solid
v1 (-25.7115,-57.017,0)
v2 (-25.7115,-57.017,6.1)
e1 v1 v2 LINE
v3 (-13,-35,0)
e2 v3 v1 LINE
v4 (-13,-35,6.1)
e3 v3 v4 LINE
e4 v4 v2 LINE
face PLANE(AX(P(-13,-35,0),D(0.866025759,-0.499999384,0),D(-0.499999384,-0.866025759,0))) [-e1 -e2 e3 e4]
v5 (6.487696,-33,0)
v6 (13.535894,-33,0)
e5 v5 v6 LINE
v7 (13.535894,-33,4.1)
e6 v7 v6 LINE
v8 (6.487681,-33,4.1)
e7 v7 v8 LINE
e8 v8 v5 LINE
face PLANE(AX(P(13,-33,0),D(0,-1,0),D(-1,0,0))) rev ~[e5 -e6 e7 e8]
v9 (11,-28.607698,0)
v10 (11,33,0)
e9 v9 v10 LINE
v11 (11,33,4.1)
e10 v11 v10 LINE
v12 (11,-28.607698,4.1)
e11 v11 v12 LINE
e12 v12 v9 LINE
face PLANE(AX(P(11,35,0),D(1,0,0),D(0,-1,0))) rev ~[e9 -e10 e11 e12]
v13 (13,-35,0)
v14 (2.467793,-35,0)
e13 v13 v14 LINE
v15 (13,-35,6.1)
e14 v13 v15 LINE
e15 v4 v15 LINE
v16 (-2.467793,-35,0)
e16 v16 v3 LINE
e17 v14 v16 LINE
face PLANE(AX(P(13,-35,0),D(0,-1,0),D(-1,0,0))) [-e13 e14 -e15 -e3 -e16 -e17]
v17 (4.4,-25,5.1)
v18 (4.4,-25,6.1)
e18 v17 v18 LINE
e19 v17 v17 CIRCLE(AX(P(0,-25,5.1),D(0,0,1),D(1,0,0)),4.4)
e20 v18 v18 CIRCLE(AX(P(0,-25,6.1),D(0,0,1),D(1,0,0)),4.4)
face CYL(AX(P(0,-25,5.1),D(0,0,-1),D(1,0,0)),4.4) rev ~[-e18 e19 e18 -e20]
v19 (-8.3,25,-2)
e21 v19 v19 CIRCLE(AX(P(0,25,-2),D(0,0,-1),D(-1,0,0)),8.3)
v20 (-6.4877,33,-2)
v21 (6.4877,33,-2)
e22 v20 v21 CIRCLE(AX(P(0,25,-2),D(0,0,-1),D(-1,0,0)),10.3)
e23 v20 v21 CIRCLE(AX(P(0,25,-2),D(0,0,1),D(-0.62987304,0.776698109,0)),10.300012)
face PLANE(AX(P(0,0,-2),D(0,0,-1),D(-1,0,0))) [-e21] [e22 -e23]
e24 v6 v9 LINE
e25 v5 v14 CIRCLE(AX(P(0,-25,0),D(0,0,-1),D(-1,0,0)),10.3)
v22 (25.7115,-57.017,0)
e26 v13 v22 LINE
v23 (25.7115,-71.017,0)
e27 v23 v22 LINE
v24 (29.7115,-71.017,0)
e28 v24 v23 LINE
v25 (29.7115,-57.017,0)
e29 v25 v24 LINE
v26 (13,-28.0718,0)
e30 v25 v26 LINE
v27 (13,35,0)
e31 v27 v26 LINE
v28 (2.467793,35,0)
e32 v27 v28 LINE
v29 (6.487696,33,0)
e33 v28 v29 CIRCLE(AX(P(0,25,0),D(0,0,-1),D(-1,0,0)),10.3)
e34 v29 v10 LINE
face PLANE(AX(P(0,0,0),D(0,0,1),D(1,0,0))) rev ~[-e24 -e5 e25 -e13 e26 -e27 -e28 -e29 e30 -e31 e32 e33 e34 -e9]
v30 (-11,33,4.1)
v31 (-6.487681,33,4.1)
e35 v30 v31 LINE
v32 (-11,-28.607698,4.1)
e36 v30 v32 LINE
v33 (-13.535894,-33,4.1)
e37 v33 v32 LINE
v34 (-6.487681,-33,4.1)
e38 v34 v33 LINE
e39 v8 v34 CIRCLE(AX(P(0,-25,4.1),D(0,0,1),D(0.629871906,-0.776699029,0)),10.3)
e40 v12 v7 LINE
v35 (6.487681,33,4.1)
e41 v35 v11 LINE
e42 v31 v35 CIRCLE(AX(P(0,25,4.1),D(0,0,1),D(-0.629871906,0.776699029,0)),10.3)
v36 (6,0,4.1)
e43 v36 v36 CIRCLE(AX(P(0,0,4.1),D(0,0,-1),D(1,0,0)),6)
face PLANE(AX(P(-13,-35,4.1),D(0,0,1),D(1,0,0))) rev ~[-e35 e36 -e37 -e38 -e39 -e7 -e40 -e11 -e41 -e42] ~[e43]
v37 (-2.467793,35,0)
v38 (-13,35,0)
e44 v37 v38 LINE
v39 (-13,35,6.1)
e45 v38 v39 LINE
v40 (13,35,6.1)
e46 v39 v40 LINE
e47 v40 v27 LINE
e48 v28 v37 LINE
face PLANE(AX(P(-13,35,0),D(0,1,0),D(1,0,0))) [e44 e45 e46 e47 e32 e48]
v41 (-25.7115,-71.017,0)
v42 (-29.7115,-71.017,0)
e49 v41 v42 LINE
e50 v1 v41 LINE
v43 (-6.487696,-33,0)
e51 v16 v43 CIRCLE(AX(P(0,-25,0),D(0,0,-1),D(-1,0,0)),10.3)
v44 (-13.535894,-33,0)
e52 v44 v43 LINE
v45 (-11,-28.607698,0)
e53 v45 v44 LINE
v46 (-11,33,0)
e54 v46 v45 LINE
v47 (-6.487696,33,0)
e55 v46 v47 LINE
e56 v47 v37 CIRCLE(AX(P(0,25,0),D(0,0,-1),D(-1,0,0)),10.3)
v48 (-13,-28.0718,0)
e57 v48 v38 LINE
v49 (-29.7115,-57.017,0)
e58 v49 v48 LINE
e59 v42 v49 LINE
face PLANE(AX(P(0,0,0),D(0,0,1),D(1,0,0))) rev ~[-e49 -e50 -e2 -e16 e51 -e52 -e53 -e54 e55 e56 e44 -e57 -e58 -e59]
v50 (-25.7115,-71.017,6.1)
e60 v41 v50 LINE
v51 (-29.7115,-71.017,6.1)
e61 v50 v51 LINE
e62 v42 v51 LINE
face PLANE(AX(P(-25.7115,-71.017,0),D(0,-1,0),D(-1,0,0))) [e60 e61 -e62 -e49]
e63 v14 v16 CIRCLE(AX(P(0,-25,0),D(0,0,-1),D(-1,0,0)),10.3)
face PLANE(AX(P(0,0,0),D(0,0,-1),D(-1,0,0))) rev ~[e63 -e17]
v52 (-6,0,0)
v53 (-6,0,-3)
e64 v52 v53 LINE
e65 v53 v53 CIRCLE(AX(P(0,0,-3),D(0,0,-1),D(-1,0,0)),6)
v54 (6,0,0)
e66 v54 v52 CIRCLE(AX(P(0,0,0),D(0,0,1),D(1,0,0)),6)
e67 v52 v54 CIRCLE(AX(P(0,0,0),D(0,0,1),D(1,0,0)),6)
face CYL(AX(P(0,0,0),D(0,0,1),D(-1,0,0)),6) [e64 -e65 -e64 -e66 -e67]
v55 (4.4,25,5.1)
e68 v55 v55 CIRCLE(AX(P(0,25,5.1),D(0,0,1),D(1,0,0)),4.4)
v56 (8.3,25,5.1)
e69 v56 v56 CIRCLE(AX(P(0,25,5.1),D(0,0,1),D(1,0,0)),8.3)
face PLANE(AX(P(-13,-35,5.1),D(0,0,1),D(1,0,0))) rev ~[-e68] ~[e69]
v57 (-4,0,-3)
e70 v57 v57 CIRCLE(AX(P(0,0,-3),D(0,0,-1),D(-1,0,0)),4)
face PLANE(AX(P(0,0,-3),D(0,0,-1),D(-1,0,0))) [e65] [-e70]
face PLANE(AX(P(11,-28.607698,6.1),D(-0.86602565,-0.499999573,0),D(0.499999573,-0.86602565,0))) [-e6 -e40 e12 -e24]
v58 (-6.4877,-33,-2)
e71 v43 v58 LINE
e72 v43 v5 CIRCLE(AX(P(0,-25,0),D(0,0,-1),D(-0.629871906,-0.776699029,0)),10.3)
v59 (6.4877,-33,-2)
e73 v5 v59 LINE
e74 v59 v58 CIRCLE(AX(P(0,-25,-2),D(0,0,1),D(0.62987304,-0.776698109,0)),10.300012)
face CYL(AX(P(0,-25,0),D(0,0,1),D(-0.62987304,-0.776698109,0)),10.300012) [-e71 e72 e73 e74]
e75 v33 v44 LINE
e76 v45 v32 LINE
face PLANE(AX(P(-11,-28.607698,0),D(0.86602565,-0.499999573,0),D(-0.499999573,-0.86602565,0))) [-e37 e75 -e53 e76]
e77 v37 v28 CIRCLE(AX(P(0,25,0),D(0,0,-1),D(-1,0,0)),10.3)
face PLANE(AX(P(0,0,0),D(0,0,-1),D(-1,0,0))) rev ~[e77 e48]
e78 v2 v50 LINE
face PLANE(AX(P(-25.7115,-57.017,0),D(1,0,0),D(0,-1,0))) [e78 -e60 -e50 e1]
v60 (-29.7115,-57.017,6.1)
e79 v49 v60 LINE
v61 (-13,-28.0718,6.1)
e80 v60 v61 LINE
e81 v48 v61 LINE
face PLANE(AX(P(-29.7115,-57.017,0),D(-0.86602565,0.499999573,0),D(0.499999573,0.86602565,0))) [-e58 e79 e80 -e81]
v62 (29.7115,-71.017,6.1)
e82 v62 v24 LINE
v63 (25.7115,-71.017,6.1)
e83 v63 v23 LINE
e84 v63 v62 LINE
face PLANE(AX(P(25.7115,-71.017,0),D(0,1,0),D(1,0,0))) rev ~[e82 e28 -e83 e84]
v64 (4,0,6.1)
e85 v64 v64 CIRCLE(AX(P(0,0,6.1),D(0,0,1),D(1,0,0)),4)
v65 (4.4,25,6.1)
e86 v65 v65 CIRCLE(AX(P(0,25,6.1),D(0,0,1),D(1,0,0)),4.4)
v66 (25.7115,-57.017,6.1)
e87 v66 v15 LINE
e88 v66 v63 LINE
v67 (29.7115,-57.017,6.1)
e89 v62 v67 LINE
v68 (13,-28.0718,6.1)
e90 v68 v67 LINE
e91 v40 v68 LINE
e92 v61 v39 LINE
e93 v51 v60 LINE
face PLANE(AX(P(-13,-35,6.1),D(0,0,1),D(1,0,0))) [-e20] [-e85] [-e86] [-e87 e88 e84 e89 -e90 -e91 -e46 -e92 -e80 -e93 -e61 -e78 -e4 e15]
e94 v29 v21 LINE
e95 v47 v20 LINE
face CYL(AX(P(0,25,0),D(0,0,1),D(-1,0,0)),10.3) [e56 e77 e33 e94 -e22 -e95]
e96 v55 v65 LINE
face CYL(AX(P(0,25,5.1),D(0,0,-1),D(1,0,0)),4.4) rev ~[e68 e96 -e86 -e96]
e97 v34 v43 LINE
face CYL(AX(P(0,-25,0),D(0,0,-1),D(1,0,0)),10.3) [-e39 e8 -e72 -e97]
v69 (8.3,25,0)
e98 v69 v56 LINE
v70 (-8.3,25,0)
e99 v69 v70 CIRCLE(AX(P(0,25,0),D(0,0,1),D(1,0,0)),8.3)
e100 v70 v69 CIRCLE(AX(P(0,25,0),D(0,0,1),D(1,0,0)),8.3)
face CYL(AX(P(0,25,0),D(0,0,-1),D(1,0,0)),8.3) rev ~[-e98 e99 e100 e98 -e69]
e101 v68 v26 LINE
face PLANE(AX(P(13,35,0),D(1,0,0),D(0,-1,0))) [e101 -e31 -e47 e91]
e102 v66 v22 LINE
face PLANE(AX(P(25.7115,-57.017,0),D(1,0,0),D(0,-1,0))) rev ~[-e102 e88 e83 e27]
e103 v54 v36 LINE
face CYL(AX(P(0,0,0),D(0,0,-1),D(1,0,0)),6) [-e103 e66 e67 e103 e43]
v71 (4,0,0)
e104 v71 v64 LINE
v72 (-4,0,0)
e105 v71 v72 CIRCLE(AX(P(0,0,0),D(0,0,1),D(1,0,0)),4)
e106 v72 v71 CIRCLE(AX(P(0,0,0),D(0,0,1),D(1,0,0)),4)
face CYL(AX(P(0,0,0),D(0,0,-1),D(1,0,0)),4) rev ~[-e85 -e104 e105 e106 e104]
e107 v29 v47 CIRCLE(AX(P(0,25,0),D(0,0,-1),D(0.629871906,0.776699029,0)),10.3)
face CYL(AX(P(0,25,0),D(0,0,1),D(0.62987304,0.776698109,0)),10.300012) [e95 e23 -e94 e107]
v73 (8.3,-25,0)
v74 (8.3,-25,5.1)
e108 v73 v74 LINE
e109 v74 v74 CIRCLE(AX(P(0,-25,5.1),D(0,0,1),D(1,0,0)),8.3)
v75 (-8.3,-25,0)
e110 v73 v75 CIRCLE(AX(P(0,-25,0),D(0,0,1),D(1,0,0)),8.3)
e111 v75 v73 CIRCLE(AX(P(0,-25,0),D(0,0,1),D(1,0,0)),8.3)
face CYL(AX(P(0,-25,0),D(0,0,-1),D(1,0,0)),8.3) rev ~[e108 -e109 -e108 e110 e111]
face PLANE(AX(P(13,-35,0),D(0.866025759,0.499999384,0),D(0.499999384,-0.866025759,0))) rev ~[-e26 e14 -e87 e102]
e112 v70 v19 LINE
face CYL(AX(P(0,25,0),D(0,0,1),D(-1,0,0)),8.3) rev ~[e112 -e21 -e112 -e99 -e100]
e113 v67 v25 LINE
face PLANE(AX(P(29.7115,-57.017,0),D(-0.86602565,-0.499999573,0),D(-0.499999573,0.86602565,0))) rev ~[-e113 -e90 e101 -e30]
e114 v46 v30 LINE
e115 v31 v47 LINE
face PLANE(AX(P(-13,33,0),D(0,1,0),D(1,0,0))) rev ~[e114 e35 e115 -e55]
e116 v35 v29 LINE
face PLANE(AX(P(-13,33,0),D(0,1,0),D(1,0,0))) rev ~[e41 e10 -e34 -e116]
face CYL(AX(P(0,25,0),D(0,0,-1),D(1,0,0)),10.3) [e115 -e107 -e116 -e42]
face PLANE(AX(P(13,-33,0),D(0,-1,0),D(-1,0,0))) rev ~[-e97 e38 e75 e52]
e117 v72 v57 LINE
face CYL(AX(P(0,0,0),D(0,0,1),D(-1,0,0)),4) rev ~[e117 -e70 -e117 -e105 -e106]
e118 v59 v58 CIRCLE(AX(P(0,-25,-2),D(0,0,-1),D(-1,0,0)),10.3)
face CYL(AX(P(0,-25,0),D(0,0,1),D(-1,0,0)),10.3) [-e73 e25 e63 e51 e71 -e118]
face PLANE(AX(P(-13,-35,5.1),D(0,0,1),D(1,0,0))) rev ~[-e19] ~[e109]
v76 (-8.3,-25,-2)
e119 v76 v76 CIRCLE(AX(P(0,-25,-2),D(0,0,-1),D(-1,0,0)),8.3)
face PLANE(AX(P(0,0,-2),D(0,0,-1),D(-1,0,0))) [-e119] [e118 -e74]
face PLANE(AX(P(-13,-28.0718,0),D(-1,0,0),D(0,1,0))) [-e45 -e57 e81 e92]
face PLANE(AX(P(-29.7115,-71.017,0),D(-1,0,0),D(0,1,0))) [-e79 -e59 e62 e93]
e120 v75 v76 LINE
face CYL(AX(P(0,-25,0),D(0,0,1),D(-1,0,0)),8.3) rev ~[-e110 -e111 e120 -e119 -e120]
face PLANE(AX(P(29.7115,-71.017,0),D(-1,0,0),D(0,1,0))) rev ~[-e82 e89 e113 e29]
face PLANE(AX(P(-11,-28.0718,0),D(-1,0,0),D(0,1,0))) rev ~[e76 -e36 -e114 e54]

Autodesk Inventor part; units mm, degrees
ref_plane "YZ Plane" through (0, 0, 0) normal (1, 0, 0) x (0, 1, 0)
ref_plane "XZ Plane" through (0, 0, 0) normal (0, 1, 0) x (-1, 0, 0)
ref_plane "XY Plane" through (0, 0, 0) normal (0, 0, 1) x (1, 0, 0)
sketch "Skizze4" plane through (0, 0, 0) normal (0, 0, 1) x (1, 0, 0)
  circle A0 centre (0, 25) radius 4 construction
  circle A1 centre (0, -25) radius 4 construction
  circle A2 centre (0, 0) radius 3 construction
  line L0 (-11.0333, -36.517) -> (-22.869, -57.017) construction
  line L1 (12.638, -36.517) -> (-11.0333, -36.517) construction
  line L2 (24.4737, -57.017) -> (12.638, -36.517) construction
  line L3 (12.638, -77.517) -> (24.4737, -57.017) construction
  circle A3 centre (0.8023, -57.017) radius 18 construction
  line L4 (12.638, -36.517) -> (-11.0333, -36.517) construction
  line L5 (-11.0333, -36.517) -> (-22.869, -57.017) construction
  line L6 (-22.869, -57.017) -> (-11.0334, -77.517) construction
  line L7 (-11.0334, -77.517) -> (12.638, -77.517) construction
  line L8 (12.638, -77.517) -> (24.4737, -57.017) construction
  line L9 (24.4737, -57.017) -> (12.638, -36.517) construction
  circle A4 centre (0, 25) radius 4.3
  circle A5 centre (0, -25) radius 4.3
  circle A6 centre (0, 0) radius 4
  circle A7 centre (0, 25) radius 8 construction
  circle A8 centre (0, -25) radius 8 projected
  circle A9 centre (0, -25) radius 8.3
  circle A10 centre (0, 25) radius 8.3
  line L10 (-13, 35) -> (13, 35)
  line L11 (13, 35) -> (13, -35)
  line L12 (13, -35) -> (-13, -35)
  line L13 (-13, -35) -> (-13, 35)
  line L14 (-13, 35) -> (13, -35) construction
  line L15 (13, 35) -> (-13, -35) construction
  line L16 (-13, -35) -> (-25.7115, -57.017)
  line L17 (-13, -35) -> (12.423, -35) construction
  line L18 (-25.7115, -57.017) -> (-25.7115, -71.017)
  line L19 (-25.7115, -71.017) -> (-29.7115, -71.017)
  line L20 (-29.7115, -71.017) -> (-29.7115, -57.017)
  line L21 (-29.7115, -57.017) -> (-13, -28.0718)
  line L22 (13, -35) -> (25.7115, -57.017)
  line L23 (13, -35) -> (38.423, -35) construction
  line L24 (25.7115, -57.017) -> (25.7115, -71.017)
  line L25 (25.7115, -71.017) -> (29.7115, -71.017)
  line L26 (29.7115, -71.017) -> (29.7115, -57.017)
  line L27 (29.7115, -57.017) -> (13, -28.0718)
  point P0 (0, 0)
  dimension "d22" = 0.3
  dimension "d23" = 0.3
  dimension "d24" = 1
  dimension "d25" = 0.3
  dimension "d26" = 0.3
  dimension "d27" = 26
  dimension "d28" = 70
  dimension "d29" = 120
  dimension "d30" = 14
  dimension "d31" = 4
  dimension "d32" = 90
  dimension "d33" = 60
  dimension "d34" = 4
  dimension "d35" = 90
  dimension "d36" = 150
  dimension "d46" = 12.7115
  dimension "d47" = 0
extrude "Extrusion4" add sketch "Skizze4" along normal up to surface (5.1 mm away) contours L10 L11 L12 L13 | L13 L16 L18 L19 L20 L21 | L27 L26 L25 L24 L22 L11
sketch "Skizze5" plane through (-13, -35, 5.1) normal (0, 0, 1) x (1, 0, 0)
  circle A0 centre (13, 60) radius 4 construction
  circle A1 centre (13, 10) radius 4 construction
  circle A2 centre (13, 60) radius 8.3 projected
  circle A3 centre (13, 10) radius 8.3 projected
  circle A4 centre (13, 35) radius 4 projected
  line L0 (26, 0) -> (0, 0) projected
  line L1 (38.7115, -22.017) -> (26, 0) projected
  line L2 (38.7115, -36.017) -> (38.7115, -22.017) projected
  line L3 (42.7115, -36.017) -> (38.7115, -36.017) projected
  line L4 (42.7115, -22.017) -> (42.7115, -36.017) projected
  line L5 (26, 6.9282) -> (42.7115, -22.017) projected
  line L6 (26, 70) -> (26, 6.9282) projected
  line L7 (0, 70) -> (26, 70) projected
  line L8 (0, 6.9282) -> (0, 70) projected
  line L9 (-16.7115, -22.017) -> (0, 6.9282) projected
  line L10 (-16.7115, -36.017) -> (-16.7115, -22.017) projected
  line L11 (-12.7115, -36.017) -> (-16.7115, -36.017) projected
  line L12 (-12.7115, -22.017) -> (-12.7115, -36.017) projected
  line L13 (0, 0) -> (-12.7115, -22.017) projected
  circle A5 centre (13, 60) radius 4.4
  circle A6 centre (13, 10) radius 4.4
  point P0 (13, 35)
  dimension "d39" = 0.4
  dimension "d40" = 0.4
extrude "Extrusion5" add sketch "Skizze5" along normal blind 1 contours A2 | A3 | L0 L13 L12 L11 L10 L9 L8 L7 L6 L5 L4 L3 L2 L1
shell "Wandung1" thickness 2 removed faces 1 at (-11.3529, 9.9806, 0)
sketch "Skizze6" plane through (0, 0, 0) normal (0, 0, -1) x (-1, 0, 0)
  circle A0 centre (0, -25) radius 4.4 projected
  circle A1 centre (0, -25) radius 8.3 projected
  arc A2 (-6.4877, 33) -> (6.4877, 33) centre (0, 25) ccw projected
  circle A3 centre (0, 25) radius 4.4 projected
  circle A4 centre (0, 25) radius 8.3 projected
  arc A5 (6.4877, -33) -> (-6.4877, -33) centre (0, -25) ccw projected
  circle A6 centre (0, -25) radius 10.3
  circle A7 centre (0, 25) radius 10.3
  point P0 (0, 0)
extrude "Extrusion6" add sketch "Skizze6" along normal blind 2 contours A7 A2 | A6 A5
sketch "Skizze7" plane through (0, 0, 0) normal (0, 0, -1) x (-1, 0, 0)
  circle A0 centre (0, 0) radius 4 projected
  circle A1 centre (0, 0) radius 6 projected
  point P0 (0, 0)
extrude "Extrusion7" add sketch "Skizze7" along normal blind 3
properties part number "28_Z_Stage"
